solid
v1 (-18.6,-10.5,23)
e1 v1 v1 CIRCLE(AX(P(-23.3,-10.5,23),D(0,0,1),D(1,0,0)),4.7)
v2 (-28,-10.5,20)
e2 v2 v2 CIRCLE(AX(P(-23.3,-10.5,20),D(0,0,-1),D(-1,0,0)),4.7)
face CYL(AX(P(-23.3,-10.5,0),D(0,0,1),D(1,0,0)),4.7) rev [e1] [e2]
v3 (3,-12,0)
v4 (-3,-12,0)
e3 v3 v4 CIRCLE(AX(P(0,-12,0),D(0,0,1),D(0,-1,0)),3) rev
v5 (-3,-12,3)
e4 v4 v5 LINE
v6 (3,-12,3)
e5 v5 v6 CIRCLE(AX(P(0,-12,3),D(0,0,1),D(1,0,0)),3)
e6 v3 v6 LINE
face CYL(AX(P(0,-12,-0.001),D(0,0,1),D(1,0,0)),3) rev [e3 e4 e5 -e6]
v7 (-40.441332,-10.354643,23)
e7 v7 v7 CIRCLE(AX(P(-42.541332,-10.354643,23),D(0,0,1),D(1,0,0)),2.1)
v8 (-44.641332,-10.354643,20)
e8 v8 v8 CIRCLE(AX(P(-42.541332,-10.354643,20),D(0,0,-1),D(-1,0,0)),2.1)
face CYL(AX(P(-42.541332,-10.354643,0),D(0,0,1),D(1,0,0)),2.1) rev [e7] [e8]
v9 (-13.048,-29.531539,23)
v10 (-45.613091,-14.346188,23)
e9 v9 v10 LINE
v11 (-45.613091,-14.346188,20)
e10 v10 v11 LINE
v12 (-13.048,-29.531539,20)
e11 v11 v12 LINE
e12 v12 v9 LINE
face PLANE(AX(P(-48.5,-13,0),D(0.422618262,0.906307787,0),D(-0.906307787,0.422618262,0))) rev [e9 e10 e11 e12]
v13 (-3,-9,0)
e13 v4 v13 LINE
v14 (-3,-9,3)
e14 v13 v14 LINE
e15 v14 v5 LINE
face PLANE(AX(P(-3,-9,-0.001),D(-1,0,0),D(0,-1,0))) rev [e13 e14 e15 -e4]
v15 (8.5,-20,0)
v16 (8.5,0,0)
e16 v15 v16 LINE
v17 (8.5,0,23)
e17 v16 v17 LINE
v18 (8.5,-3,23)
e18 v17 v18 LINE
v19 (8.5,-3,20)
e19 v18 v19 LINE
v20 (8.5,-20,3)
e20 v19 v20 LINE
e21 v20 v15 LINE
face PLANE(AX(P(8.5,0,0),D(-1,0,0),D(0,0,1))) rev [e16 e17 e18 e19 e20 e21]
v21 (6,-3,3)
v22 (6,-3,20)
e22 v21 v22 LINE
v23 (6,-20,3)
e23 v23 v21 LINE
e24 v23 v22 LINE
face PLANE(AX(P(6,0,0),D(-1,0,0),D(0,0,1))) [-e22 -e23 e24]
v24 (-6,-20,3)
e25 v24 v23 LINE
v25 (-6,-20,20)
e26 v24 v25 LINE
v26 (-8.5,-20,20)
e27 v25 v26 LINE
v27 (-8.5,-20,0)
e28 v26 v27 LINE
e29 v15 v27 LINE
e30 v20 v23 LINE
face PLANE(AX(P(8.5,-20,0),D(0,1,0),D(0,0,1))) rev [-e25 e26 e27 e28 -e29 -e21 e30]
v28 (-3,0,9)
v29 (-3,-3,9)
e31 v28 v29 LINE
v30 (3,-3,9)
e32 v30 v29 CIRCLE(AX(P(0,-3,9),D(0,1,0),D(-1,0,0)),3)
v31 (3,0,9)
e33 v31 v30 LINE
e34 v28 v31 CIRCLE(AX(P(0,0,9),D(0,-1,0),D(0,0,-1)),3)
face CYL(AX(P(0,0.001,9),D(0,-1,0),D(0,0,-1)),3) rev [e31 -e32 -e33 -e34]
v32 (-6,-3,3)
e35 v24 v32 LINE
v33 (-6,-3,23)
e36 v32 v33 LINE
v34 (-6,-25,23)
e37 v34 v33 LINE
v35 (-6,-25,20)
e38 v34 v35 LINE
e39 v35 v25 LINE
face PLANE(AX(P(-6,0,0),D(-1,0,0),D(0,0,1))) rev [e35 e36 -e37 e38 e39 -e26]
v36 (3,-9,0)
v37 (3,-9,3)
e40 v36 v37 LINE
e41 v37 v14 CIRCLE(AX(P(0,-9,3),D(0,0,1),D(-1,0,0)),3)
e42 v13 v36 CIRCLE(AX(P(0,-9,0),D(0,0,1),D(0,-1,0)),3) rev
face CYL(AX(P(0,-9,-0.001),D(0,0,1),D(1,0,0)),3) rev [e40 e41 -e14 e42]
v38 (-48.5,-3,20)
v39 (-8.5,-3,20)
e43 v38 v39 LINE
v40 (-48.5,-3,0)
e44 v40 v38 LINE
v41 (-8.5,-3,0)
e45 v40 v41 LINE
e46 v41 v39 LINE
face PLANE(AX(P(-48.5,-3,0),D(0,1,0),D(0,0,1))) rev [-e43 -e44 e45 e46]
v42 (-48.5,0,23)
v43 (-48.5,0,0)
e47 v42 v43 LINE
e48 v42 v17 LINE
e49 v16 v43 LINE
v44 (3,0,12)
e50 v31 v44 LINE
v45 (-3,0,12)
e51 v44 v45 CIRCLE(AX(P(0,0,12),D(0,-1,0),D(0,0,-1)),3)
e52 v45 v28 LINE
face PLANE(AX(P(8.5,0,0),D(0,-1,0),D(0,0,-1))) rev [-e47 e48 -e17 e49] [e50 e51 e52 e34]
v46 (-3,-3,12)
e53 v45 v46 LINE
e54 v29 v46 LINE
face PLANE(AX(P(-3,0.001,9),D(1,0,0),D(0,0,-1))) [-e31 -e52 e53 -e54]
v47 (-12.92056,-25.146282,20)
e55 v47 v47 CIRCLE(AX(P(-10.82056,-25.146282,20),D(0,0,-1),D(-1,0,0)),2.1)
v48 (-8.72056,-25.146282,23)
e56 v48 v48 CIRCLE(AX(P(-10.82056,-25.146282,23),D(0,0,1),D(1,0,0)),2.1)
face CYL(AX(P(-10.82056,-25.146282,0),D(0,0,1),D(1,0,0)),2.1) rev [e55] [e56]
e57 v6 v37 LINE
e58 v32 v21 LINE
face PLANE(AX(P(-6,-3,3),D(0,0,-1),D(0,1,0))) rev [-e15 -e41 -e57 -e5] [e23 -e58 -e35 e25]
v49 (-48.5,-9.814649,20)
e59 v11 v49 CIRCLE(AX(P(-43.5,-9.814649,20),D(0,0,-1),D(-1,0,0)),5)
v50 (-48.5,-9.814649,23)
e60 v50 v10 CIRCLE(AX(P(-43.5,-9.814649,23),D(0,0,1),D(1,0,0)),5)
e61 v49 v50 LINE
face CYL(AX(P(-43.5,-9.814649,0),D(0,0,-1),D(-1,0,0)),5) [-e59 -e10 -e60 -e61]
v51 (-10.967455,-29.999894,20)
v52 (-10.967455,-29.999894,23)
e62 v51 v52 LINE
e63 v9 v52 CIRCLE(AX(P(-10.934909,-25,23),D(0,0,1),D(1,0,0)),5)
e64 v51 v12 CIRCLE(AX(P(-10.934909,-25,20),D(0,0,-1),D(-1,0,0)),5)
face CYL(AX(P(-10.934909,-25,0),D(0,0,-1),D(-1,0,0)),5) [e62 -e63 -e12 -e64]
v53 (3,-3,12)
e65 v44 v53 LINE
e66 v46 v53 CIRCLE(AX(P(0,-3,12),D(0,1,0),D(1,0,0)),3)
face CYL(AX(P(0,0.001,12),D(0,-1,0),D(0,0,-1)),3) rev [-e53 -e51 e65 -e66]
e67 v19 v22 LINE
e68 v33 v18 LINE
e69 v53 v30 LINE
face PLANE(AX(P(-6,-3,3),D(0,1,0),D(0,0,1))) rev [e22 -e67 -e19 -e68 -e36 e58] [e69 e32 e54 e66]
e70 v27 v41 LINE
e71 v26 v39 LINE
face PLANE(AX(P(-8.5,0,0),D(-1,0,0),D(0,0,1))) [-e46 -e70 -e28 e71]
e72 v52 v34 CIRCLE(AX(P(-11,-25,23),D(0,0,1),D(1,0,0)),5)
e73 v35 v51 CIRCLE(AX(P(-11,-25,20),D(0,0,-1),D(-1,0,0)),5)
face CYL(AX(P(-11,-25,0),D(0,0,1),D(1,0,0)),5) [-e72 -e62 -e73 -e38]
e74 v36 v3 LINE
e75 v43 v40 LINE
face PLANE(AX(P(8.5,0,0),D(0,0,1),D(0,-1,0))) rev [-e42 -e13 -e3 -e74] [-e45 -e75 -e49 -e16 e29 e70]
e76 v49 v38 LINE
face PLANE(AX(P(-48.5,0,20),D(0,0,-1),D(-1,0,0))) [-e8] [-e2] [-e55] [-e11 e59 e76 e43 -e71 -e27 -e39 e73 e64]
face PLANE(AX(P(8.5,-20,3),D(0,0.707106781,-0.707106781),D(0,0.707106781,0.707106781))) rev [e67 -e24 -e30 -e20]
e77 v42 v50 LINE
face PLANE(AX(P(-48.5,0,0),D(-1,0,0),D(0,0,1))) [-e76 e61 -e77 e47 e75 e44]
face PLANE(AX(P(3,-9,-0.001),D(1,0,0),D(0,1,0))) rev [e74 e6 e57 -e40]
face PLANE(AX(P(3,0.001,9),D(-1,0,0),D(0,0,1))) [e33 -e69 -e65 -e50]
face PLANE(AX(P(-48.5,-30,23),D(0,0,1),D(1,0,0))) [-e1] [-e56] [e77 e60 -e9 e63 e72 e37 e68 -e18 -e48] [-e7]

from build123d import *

# Parameters (mm, degrees)
BOSS_EXTRUDE1_DEPTH      = 8.5
SKETCH2_W                = 17
SKETCH2_H                = 17
CUT_EXTRUDE1_DEPTH       = 6
CUT_EXTRUDE2_REACH       = 29.591
ESBO_O1_W                = 20
ESBO_O1_H                = 3
RESSALTO_EXTRUS_O1_DEPTH = 40
ESBO_O2_W                = 3
ESBO_O2_H                = 30
RESSALTO_EXTRUS_O2_DEPTH = 57
RESSALTO_EXTRUS_O3_REACH = 62.434
ESBO_O3_W                = 2.5
ESBO_O3_H                = 17
ESBO_O5_W                = 14.5
ESBO_O5_H                = 27
CORTE_EXTRUS_O1_DEPTH    = 61.433848132
CORTE_EXTRUS_O2_DEPTH    = 62.491869381
FILETE1_R                = 5
ESBO_O7_R                = 2.099999999
ESBO_O7_R_2              = 4.7
CORTE_EXTRUS_O3_DEPTH    = 62.491817705


with BuildPart() as part:
    # Sketch1 → Boss-Extrude1 (new, symmetric)
    with BuildSketch(Plane(origin=(0, 0, 0), x_dir=(0, 0, -1), z_dir=(1, 0, 0))):
        Polygon((0, 0), (-20, 0), (-20, -3), (-11.5, -11.5), (-3, -20), (0, -20), align=None)
    extrude(amount=BOSS_EXTRUDE1_DEPTH, both=True)

    # Sketch2 → Cut-Extrude1 (cut, symmetric)
    with BuildSketch(Plane(origin=(0, 0, 0), x_dir=(0, 0, -1), z_dir=(1, 0, 0))):
        with Locations((-11.5, -11.5)):
            Rectangle(SKETCH2_W, SKETCH2_H)
    extrude(amount=CUT_EXTRUDE1_DEPTH, both=True, mode=Mode.SUBTRACT)

    # Sketch3 → Cut-Extrude2 (cut, up to next)
    with BuildSketch(Plane.XY.offset(3), mode=Mode.PRIVATE) as cut_extrude2_sk1:
        with BuildLine():
            Line((-3, -9), (-3, -12))
            ThreePointArc((-3, -12), (0, -15), (3, -12))
            Line((3, -12), (3, -9))
            ThreePointArc((3, -9), (0, -6), (-3, -9))
        make_face()
    cut_extrude2_tool1 = extrude(cut_extrude2_sk1.sketch, amount=-CUT_EXTRUDE2_REACH, mode=Mode.PRIVATE) & part.part
    cut_extrude2 = cut_extrude2_tool1.solids().sort_by_distance((0, -10.5, 3))[0]
    add(cut_extrude2, mode=Mode.SUBTRACT)

    # Mirror1: Cut-Extrude2 across plane
    add(cut_extrude2.mirror(Plane(origin=(0, 0, 0), x_dir=(0, -0.7071067811865481, 0.707106781186547), z_dir=(0, 0.7071067811865471, 0.707106781186548))), mode=Mode.SUBTRACT)

    # Esboço1 → Ressalto-extrusão1 (add)
    with BuildSketch(Plane.ZY.offset(8.5)):
        with Locations((10, -1.5)):
            Rectangle(ESBO_O1_W, ESBO_O1_H)
    extrude(amount=RESSALTO_EXTRUS_O1_DEPTH)

    # Esboço2 → Ressalto-extrusão2 (add)
    with BuildSketch(Plane(origin=(8.5, 0, 0), x_dir=(0, 0, -1), z_dir=(1, 0, 0))):
        with Locations((-21.5, -15)):
            Rectangle(ESBO_O2_W, ESBO_O2_H)
    extrude(amount=-RESSALTO_EXTRUS_O2_DEPTH)

    # Ressalto-extrusão3: up to this face of the body (flat: up to its plane)
    ressalto_extrus_o3_end = Plane(part.part.faces().sort_by_distance((7.25, -11.5, 11.5))[0])
    # Esboço3 → Ressalto-extrusão3 (add, up to the picked face)
    with BuildSketch(Plane(origin=(0, 0, 20), x_dir=(-1, 0, 0), z_dir=(0, 0, -1)), mode=Mode.PRIVATE) as ressalto_extrus_o3_sk1:
        with Locations((7.25, -11.5)):
            Rectangle(ESBO_O3_W, ESBO_O3_H)
    ressalto_extrus_o3_tool1 = split(extrude(ressalto_extrus_o3_sk1.sketch, amount=RESSALTO_EXTRUS_O3_REACH, mode=Mode.PRIVATE), bisect_by=ressalto_extrus_o3_end, keep=Keep.BOTH, mode=Mode.PRIVATE)
    add(ressalto_extrus_o3_tool1.solids().sort_by(Axis((-7.25, -11.5, 20), (0, 0, -1)))[0])

    # Esboço5 → Corte-extrusão1 (cut, through all)
    with BuildSketch(Plane(origin=(0, 0, 20), x_dir=(-1, 0, 0), z_dir=(0, 0, -1))):
        with Locations((-1.25, -16.5)):
            Rectangle(ESBO_O5_W, ESBO_O5_H)
    extrude(amount=-CORTE_EXTRUS_O1_DEPTH, mode=Mode.SUBTRACT)

    # Esboço6 → Corte-extrusão2 (cut, through all)
    with BuildSketch(Plane.XY.offset(23)):
        Polygon((-48.5, -13), (-12.043382351, -30), (-48.5, -30), align=None)
    extrude(amount=-CORTE_EXTRUS_O2_DEPTH, mode=Mode.SUBTRACT)

    # Filete1
    # the kernel refuses this fillet: 5 mm, written as the material it takes off along each edge
    with BuildSketch(Plane(origin=(-48.5, -13, 30.96337826), x_dir=(0, 1, 0), z_dir=(0, 0, -1))) as filete1_piece_1:
        with BuildLine():
            CenterArc((FILETE1_R * 0.637070260807, FILETE1_R), FILETE1_R, 205, 65)
            Line((-FILETE1_R * 0.269237526229, FILETE1_R * 0.577381738259), (0, 0))
            Line((0, 0), (FILETE1_R * 0.637070260807, 0))
        make_face()
    extrude(amount=18.92675652, mode=Mode.SUBTRACT)
    with BuildSketch(Plane(origin=(-12.043382351, -30, 25.771183283), x_dir=(-0.9063077870366518, 0.4226182617406957, 0), z_dir=(0, 0, -1))) as filete1_piece_2:
        with BuildLine():
            CenterArc((FILETE1_R * 0.221694662643, FILETE1_R), FILETE1_R, 245, 25)
            Line((-FILETE1_R * 0.200923599098, FILETE1_R * 0.0936922129633), (0, 0))
            Line((0, 0), (FILETE1_R * 0.221694662643, 0))
        make_face()
    extrude(amount=8.542366566, mode=Mode.SUBTRACT)
    with BuildSketch(Plane(origin=(-6, -30, 7.5), x_dir=(-1, 0, 0), z_dir=(0, 0, 1))) as filete1_piece_3:
        with BuildLine():
            CenterArc((FILETE1_R, -FILETE1_R), FILETE1_R, 90, 90)
            Line((0, -FILETE1_R), (0, 0))
            Line((0, 0), (FILETE1_R, 0))
        make_face()
    extrude(amount=28, mode=Mode.SUBTRACT)

    # Esboço7 → Corte-extrusão3 (cut, through all)
    with BuildSketch(Plane.XY.offset(23)):
        with Locations((-42.541332366, -10.354642716)):
            Circle(ESBO_O7_R)
        with Locations((-10.82055982, -25.146281877)):
            Circle(ESBO_O7_R)
        with Locations((-23.3, -10.5)):
            Circle(ESBO_O7_R_2)
    extrude(amount=-CORTE_EXTRUS_O3_DEPTH, mode=Mode.SUBTRACT)


solid = part.part
